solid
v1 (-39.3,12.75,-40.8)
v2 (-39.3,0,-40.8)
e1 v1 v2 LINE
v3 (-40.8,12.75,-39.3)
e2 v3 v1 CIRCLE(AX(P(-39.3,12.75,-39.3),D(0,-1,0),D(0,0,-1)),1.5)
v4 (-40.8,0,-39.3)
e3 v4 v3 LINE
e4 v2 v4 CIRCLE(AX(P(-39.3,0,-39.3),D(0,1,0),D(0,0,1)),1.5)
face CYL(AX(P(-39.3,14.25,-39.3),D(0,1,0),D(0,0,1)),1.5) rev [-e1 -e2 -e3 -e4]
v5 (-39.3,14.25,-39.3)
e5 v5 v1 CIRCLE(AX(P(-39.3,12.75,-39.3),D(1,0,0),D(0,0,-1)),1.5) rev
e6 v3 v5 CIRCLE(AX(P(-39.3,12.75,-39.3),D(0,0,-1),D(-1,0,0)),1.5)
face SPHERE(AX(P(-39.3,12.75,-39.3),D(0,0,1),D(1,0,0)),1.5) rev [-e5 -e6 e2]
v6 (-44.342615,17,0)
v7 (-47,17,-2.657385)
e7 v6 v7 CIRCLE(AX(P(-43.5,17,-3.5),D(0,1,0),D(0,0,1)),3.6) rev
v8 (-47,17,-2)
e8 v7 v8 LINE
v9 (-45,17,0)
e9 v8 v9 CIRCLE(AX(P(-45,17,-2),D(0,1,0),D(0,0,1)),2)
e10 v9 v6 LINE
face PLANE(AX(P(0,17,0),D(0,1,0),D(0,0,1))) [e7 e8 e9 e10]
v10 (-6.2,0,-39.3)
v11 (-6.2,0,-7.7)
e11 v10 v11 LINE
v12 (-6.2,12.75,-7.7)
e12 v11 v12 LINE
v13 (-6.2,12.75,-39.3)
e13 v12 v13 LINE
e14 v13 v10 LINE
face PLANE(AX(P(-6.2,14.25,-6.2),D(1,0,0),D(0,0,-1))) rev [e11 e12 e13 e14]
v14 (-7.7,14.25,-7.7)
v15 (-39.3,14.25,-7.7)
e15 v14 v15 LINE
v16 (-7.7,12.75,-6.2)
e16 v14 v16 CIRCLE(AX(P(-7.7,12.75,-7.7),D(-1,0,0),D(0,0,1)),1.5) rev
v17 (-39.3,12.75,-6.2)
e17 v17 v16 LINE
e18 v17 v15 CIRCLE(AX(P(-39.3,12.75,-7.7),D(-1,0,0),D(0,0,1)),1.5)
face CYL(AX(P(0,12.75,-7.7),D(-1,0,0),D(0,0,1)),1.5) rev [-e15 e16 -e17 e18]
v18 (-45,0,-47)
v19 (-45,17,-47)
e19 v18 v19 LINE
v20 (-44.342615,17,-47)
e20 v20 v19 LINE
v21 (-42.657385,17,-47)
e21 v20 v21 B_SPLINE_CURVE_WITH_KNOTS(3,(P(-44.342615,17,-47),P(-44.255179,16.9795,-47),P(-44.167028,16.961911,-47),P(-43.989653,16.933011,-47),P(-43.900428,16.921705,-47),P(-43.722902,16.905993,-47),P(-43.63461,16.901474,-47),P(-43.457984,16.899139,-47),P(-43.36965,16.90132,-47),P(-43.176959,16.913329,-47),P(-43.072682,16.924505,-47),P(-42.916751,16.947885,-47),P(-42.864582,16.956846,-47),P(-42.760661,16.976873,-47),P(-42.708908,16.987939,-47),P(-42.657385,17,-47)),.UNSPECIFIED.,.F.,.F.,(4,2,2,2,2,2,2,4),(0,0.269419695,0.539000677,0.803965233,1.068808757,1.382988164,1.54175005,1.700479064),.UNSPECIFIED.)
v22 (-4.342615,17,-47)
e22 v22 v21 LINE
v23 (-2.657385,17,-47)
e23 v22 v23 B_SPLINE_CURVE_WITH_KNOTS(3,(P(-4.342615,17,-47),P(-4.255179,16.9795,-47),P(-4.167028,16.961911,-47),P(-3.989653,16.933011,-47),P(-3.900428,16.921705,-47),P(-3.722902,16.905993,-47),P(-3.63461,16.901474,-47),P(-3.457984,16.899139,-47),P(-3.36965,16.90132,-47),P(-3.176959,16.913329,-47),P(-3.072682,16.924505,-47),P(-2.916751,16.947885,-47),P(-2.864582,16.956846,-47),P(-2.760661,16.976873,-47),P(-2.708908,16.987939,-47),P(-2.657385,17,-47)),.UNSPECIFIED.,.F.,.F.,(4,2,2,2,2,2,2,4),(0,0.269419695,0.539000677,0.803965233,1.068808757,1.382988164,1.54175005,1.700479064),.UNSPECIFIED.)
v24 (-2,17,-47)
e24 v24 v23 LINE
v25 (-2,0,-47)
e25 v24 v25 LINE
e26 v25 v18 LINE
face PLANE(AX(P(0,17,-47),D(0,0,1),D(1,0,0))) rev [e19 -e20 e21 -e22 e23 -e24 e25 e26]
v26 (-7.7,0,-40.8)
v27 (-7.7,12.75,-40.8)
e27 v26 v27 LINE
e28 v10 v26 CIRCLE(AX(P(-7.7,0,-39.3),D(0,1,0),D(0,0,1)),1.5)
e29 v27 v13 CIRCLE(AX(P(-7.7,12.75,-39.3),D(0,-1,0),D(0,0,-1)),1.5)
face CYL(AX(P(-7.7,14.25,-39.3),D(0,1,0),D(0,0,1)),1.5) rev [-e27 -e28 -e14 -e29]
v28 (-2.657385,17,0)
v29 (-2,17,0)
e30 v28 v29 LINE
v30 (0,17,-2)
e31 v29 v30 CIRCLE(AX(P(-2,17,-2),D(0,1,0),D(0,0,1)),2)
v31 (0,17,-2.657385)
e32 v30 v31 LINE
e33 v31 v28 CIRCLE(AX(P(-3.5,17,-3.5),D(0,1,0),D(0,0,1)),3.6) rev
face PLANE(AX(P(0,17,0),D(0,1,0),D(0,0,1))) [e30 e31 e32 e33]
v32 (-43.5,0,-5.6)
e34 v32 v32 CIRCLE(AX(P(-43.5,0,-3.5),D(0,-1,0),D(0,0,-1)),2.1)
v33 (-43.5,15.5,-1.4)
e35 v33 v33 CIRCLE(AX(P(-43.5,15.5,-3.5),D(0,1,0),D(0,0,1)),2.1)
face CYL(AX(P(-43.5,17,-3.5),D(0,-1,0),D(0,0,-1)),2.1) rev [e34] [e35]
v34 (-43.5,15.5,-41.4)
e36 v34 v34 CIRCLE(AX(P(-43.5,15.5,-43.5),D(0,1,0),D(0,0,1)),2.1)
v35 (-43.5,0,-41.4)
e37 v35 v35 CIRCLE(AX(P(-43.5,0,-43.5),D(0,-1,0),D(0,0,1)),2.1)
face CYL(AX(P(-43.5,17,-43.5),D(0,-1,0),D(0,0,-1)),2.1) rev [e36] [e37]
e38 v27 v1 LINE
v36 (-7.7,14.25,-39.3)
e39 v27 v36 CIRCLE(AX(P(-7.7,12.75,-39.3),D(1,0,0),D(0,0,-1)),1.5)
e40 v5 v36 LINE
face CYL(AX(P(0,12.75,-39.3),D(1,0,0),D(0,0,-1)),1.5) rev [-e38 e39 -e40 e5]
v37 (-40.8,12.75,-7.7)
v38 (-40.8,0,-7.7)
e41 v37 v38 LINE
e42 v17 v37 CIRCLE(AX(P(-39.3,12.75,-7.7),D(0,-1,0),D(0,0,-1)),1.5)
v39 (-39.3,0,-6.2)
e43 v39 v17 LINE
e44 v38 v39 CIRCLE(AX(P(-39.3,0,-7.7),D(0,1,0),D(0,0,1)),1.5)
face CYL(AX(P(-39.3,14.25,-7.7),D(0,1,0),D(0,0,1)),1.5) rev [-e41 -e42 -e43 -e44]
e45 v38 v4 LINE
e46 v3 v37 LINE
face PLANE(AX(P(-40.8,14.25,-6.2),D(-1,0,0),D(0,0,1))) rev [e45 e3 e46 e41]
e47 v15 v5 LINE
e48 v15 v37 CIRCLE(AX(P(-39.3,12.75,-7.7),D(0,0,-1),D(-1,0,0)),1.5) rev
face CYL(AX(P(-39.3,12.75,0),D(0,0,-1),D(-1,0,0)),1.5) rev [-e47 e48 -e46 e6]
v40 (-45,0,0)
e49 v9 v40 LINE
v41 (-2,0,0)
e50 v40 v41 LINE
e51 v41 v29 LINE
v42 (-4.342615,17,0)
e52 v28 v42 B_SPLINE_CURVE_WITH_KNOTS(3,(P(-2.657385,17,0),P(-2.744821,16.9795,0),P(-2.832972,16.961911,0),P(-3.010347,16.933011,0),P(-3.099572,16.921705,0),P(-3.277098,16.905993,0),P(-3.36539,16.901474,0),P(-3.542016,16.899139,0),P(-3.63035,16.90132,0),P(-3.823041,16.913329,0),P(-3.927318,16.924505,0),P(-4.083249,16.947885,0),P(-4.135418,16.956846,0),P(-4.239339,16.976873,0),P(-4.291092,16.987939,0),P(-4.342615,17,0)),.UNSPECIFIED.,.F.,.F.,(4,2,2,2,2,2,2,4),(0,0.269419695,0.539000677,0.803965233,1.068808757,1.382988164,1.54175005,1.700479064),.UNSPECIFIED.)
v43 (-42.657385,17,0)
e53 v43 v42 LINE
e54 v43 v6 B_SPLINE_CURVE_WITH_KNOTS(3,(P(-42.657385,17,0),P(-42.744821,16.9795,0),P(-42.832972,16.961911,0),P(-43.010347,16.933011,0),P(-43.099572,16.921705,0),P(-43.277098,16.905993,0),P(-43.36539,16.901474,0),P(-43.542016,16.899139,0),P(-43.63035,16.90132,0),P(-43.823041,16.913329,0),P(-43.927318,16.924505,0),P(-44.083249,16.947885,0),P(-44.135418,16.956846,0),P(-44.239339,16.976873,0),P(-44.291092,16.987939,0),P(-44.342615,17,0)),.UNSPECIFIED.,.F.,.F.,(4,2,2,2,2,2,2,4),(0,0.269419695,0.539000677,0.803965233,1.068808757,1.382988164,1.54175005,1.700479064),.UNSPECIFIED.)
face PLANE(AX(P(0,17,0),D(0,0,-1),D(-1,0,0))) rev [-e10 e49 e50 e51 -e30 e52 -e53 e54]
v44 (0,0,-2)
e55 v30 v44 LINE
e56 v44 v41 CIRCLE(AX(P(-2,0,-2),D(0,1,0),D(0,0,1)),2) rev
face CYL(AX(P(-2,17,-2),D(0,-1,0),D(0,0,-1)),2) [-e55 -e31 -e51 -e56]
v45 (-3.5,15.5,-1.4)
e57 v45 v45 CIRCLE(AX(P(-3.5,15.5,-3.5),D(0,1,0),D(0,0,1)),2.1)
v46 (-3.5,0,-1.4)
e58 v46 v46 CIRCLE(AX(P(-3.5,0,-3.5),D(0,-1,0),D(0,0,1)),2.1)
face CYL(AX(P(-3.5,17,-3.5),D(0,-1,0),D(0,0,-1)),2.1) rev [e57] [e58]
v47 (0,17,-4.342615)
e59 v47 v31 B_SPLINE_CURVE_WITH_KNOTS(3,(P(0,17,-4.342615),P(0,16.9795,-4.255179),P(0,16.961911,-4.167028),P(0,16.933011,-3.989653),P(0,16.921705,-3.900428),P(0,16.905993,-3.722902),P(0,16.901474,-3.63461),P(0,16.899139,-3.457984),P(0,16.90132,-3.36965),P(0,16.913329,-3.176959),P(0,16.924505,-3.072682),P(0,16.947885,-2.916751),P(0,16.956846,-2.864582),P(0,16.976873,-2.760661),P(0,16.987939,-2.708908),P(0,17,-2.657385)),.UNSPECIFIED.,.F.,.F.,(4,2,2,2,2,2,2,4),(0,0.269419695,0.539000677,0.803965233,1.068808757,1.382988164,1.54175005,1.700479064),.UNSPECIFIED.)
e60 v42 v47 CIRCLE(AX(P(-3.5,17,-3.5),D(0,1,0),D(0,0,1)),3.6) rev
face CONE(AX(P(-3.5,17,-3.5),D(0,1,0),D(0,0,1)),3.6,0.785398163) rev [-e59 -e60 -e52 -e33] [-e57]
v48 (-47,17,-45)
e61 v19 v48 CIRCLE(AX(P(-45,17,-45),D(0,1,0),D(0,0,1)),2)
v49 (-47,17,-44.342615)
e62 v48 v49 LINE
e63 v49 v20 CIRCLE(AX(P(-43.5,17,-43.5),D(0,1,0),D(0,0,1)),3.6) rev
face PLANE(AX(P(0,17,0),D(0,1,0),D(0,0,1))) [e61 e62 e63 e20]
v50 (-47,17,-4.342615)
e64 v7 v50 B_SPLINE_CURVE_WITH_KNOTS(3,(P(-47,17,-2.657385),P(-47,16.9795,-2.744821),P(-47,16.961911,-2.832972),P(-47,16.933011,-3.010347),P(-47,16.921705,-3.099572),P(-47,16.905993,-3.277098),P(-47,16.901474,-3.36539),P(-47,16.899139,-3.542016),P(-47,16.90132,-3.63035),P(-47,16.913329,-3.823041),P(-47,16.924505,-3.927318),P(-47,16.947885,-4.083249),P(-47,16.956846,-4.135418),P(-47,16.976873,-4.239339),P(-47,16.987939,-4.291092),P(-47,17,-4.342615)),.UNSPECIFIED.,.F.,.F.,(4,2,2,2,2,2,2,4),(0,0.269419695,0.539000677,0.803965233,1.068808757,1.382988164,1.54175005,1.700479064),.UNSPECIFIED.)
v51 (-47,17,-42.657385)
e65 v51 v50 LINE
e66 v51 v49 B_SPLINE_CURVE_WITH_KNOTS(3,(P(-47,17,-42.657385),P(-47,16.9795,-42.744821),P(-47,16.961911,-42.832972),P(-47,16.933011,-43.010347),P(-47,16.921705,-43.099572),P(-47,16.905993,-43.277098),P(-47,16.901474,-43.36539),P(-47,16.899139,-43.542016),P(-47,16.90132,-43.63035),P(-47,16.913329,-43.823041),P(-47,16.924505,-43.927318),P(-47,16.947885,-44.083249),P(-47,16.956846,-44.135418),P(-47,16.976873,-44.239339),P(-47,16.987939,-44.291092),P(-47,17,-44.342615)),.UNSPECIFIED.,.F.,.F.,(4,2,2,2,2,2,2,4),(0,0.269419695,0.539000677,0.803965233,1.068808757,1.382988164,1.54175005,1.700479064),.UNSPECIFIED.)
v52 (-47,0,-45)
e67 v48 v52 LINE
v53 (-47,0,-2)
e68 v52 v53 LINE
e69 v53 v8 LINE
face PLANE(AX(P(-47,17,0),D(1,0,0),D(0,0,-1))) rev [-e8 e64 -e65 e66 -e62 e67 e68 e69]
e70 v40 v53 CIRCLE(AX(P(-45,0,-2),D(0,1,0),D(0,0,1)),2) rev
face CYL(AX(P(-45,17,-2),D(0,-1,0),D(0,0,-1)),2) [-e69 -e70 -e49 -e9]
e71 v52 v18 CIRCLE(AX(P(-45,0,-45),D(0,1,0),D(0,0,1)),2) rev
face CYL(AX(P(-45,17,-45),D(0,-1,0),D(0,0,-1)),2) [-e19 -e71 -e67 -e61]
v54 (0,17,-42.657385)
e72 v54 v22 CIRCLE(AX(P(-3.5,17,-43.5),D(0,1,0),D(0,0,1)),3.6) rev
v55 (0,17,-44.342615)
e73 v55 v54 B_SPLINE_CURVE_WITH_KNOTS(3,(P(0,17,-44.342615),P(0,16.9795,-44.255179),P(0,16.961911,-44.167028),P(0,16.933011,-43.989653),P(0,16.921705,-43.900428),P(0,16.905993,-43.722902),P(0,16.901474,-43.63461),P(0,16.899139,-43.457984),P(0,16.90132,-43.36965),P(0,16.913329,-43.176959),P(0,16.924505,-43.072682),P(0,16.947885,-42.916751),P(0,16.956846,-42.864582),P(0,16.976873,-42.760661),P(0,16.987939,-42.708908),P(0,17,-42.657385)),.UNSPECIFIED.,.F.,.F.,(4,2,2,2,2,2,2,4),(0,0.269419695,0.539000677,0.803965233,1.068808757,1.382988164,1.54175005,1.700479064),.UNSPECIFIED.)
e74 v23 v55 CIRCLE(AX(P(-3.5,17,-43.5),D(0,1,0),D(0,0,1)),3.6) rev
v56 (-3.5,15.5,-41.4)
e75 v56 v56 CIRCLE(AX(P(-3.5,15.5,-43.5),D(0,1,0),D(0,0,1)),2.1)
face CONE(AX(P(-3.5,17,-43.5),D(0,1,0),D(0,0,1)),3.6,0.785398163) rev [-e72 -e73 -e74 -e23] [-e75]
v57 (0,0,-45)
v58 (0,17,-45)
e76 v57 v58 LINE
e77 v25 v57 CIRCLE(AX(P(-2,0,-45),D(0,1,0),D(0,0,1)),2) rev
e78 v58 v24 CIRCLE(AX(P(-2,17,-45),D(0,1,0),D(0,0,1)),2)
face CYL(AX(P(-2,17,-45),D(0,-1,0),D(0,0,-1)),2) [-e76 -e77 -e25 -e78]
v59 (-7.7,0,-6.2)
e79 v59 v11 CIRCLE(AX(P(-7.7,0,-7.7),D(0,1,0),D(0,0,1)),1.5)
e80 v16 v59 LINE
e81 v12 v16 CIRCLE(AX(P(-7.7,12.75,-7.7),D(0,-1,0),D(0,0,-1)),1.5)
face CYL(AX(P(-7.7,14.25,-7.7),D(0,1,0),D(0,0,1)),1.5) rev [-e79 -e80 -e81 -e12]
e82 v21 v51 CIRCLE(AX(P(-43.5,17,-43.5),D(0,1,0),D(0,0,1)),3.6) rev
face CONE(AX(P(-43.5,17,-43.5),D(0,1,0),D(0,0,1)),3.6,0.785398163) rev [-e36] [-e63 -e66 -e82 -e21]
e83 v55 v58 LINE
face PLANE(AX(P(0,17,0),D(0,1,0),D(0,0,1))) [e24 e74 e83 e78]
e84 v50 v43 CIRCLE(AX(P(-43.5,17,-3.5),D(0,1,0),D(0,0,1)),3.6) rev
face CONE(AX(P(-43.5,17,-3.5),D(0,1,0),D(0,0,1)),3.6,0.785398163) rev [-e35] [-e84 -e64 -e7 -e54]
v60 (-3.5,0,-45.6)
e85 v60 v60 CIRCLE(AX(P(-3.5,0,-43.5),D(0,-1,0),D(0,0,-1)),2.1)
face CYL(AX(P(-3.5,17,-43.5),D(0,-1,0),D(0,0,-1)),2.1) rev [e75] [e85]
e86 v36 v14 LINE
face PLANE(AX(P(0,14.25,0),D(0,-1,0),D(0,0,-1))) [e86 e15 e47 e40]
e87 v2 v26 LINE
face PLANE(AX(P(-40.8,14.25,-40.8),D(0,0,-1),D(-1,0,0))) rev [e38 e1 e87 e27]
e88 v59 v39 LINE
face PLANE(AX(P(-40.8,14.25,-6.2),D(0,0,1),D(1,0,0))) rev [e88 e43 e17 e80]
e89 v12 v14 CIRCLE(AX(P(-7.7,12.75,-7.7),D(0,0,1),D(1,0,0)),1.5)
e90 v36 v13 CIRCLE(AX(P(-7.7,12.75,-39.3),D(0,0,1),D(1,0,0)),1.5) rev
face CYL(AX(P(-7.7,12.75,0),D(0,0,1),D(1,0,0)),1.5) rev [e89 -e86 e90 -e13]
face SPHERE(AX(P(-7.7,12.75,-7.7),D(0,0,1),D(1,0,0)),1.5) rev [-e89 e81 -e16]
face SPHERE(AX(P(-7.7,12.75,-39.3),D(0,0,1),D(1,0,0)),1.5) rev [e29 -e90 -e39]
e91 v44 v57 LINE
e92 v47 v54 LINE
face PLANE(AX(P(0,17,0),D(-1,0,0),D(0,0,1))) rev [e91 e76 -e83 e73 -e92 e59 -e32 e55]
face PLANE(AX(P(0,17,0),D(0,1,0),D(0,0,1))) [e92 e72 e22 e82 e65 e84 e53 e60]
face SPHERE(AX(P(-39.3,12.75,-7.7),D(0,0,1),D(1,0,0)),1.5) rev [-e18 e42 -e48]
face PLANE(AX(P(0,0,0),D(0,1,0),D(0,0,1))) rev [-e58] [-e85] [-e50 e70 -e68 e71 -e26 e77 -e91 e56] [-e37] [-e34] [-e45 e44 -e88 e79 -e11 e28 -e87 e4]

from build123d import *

# Parameters (mm, degrees)
SKETCH_1_W          = 47
SKETCH_1_H          = 47
EXTRUDE_1_DEPTH     = 17
SKETCH_2_R          = 2.1
CUT_EXTRUDE_1_DEPTH = 69.607579756
SKETCH_3_W          = 34.6
SKETCH_3_H          = 34.6
CUT_EXTRUDE_2_DEPTH = 14.25
FILLET_1_R          = 2
FILLET_2_R          = 1.5
CHAMFER_1_SIZE      = 1.5
FILLET_3_R          = 1.5


with BuildPart() as part:
    # Эскиз1 → Бобышка-Вытянуть1 (new body)
    with BuildSketch(Plane(origin=(0, 0, 0), x_dir=(1, 0, 0), z_dir=(0, 1, 0))):
        with Locations((-23.5, 23.5)):
            Rectangle(SKETCH_1_W, SKETCH_1_H)
    extrude(amount=EXTRUDE_1_DEPTH)

    # Эскиз2 → Вырез-Вытянуть1 (cut, through all)
    with BuildSketch(Plane.XZ):
        with Locations(Location((-43.5, -3.5, 0), (0, 0, 270))):
            Circle(SKETCH_2_R)
        with Locations(Location((-3.5, -3.5, 0), (0, 0, 90))):
            Circle(SKETCH_2_R)
        with Locations(Location((-3.5, -43.5, 0), (0, 0, 270))):
            Circle(SKETCH_2_R)
        with Locations(Location((-43.5, -43.5, 0), (0, 0, 90))):
            Circle(SKETCH_2_R)
    extrude(amount=-CUT_EXTRUDE_1_DEPTH, mode=Mode.SUBTRACT)

    # Эскиз3 → Вырез-Вытянуть2 (cut)
    with BuildSketch(Plane.XZ):
        with Locations((-23.5, -23.5)):
            Rectangle(SKETCH_3_W, SKETCH_3_H)
    extrude(amount=-CUT_EXTRUDE_2_DEPTH, mode=Mode.SUBTRACT)

    # Скругление1
    fillet_1_edges = [part.edges().sort_by_distance(p)[0] for p in [
        (0, 8.5, 0),
        (-47, 8.5, 0),
        (-47, 8.5, -47),
        (0, 8.5, -47),
    ]]
    fillet(fillet_1_edges, radius=FILLET_1_R)

    # Скругление2
    fillet_2_edges = [part.edges().sort_by_distance(p)[0] for p in [
        (-40.8, 14.25, -23.5),
        (-23.5, 14.25, -6.2),
        (-6.2, 14.25, -23.5),
        (-23.5, 14.25, -40.8),
    ]]
    fillet(fillet_2_edges, radius=FILLET_2_R)

    # Фаска1
    # the kernel refuses this chamfer: 1.5 mm, written as the material it takes off along each edge
    with BuildSketch(Plane(origin=(-43.5, 17, -43.5), x_dir=(0, 0, 1), z_dir=(1, 0, 0))) as chamfer_1_piece_1:
        Polygon((2.1, CHAMFER_1_SIZE), (2.1 + CHAMFER_1_SIZE, 0), (2.1, 0), align=None)
    revolve(axis=Axis((-43.5, 17, -43.5), (0, -1, 0)), mode=Mode.SUBTRACT)
    with BuildSketch(Plane(origin=(-3.5, 17, -43.5), x_dir=(0, 0, -1), z_dir=(-1, 0, 0))) as chamfer_1_piece_2:
        Polygon((2.1, CHAMFER_1_SIZE), (2.1 + CHAMFER_1_SIZE, 0), (2.1, 0), align=None)
    revolve(axis=Axis((-3.5, 17, -43.5), (0, -1, 0)), mode=Mode.SUBTRACT)
    with BuildSketch(Plane(origin=(-3.5, 17, -3.5), x_dir=(0, 0, 1), z_dir=(1, 0, 0))) as chamfer_1_piece_3:
        Polygon((2.1, CHAMFER_1_SIZE), (2.1 + CHAMFER_1_SIZE, 0), (2.1, 0), align=None)
    revolve(axis=Axis((-3.5, 17, -3.5), (0, -1, 0)), mode=Mode.SUBTRACT)
    with BuildSketch(Plane(origin=(-43.5, 17, -3.5), x_dir=(0, 0, -1), z_dir=(-1, 0, 0))) as chamfer_1_piece_4:
        Polygon((2.1, CHAMFER_1_SIZE), (2.1 + CHAMFER_1_SIZE, 0), (2.1, 0), align=None)
    revolve(axis=Axis((-43.5, 17, -3.5), (0, -1, 0)), mode=Mode.SUBTRACT)

    # Скругление3
    # the kernel refuses this fillet: 1.5 mm, written as the material it adds along each edge
    with BuildSketch(Plane(origin=(-39.3, 12.75, -39.3), x_dir=(0, 0, -1), z_dir=(-1, 0, 0))) as fillet_3_piece_1_section:
        Polygon((0, 0), (FILLET_3_R, 0), (FILLET_3_R, -FILLET_3_R), (0, -FILLET_3_R), align=None)
    fillet_3_piece_1 = extrude(amount=FILLET_3_R, mode=Mode.PRIVATE)
    fillet_3_piece_1 = fillet_3_piece_1 - Plane(origin=(-39.3, 12.75, -39.3), x_dir=(0, -0.7071067811865475, 0.7071067811865475), z_dir=(-1, 0, 0)) * Sphere(FILLET_3_R, mode=Mode.PRIVATE)
    add(fillet_3_piece_1)
    with BuildSketch(Plane(origin=(-39.3, 12.75, -7.7), x_dir=(0, 0, 1), z_dir=(-1, 0, 0))) as fillet_3_piece_2_section:
        Polygon((0, 0), (FILLET_3_R, 0), (FILLET_3_R, FILLET_3_R), (0, FILLET_3_R), align=None)
    fillet_3_piece_2 = extrude(amount=FILLET_3_R, mode=Mode.PRIVATE)
    fillet_3_piece_2 = fillet_3_piece_2 - Plane(origin=(-39.3, 12.75, -7.7), x_dir=(0, -0.7071067811865475, -0.7071067811865475), z_dir=(-1, 0, 0)) * Sphere(FILLET_3_R, mode=Mode.PRIVATE)
    add(fillet_3_piece_2)
    with BuildSketch(Plane(origin=(-7.7, 12.75, -39.3), x_dir=(1, 0, 0), z_dir=(0, 0, -1))) as fillet_3_piece_3_section:
        Polygon((0, 0), (FILLET_3_R, 0), (FILLET_3_R, -FILLET_3_R), (0, -FILLET_3_R), align=None)
    fillet_3_piece_3 = extrude(amount=FILLET_3_R, mode=Mode.PRIVATE)
    fillet_3_piece_3 = fillet_3_piece_3 - Plane(origin=(-7.7, 12.75, -39.3), x_dir=(-0.7071067811865475, -0.7071067811865475, 0), z_dir=(0, 0, -1)) * Sphere(FILLET_3_R, mode=Mode.PRIVATE)
    add(fillet_3_piece_3)
    with BuildSketch(Plane(origin=(-7.7, 12.75, -7.7), x_dir=(1, 0, 0), z_dir=(0, 0, 1))) as fillet_3_piece_4_section:
        Polygon((0, 0), (FILLET_3_R, 0), (FILLET_3_R, FILLET_3_R), (0, FILLET_3_R), align=None)
    fillet_3_piece_4 = extrude(amount=FILLET_3_R, mode=Mode.PRIVATE)
    fillet_3_piece_4 = fillet_3_piece_4 - Plane(origin=(-7.7, 12.75, -7.7), x_dir=(-0.7071067811865475, -0.7071067811865475, 0), z_dir=(0, 0, 1)) * Sphere(FILLET_3_R, mode=Mode.PRIVATE)
    add(fillet_3_piece_4)
    with BuildSketch(Plane(origin=(-6.2, 0, -6.2), x_dir=(-1, 0, 0), z_dir=(0, 1, 0)), Plane(origin=(-40.8, 0, -6.2), x_dir=(0, 0, -1), z_dir=(0, 1, 0))) as fillet_3_piece_5:
        with BuildLine():
            CenterArc((FILLET_3_R, -FILLET_3_R), FILLET_3_R, 90, 90)
            Line((0, -FILLET_3_R), (0, 0))
            Line((0, 0), (FILLET_3_R, 0))
        make_face()
    extrude(amount=12.75)
    with BuildSketch(Plane(origin=(-6.2, 0, -40.8), x_dir=(-1, 0, 0), z_dir=(0, 1, 0)), Plane(origin=(-40.8, 0, -40.8), x_dir=(0, 0, 1), z_dir=(0, 1, 0))) as fillet_3_piece_6:
        with BuildLine():
            CenterArc((FILLET_3_R, FILLET_3_R), FILLET_3_R, 180, 90)
            Line((0, FILLET_3_R), (0, 0))
            Line((0, 0), (FILLET_3_R, 0))
        make_face()
    extrude(amount=12.75)


solid = part.part
